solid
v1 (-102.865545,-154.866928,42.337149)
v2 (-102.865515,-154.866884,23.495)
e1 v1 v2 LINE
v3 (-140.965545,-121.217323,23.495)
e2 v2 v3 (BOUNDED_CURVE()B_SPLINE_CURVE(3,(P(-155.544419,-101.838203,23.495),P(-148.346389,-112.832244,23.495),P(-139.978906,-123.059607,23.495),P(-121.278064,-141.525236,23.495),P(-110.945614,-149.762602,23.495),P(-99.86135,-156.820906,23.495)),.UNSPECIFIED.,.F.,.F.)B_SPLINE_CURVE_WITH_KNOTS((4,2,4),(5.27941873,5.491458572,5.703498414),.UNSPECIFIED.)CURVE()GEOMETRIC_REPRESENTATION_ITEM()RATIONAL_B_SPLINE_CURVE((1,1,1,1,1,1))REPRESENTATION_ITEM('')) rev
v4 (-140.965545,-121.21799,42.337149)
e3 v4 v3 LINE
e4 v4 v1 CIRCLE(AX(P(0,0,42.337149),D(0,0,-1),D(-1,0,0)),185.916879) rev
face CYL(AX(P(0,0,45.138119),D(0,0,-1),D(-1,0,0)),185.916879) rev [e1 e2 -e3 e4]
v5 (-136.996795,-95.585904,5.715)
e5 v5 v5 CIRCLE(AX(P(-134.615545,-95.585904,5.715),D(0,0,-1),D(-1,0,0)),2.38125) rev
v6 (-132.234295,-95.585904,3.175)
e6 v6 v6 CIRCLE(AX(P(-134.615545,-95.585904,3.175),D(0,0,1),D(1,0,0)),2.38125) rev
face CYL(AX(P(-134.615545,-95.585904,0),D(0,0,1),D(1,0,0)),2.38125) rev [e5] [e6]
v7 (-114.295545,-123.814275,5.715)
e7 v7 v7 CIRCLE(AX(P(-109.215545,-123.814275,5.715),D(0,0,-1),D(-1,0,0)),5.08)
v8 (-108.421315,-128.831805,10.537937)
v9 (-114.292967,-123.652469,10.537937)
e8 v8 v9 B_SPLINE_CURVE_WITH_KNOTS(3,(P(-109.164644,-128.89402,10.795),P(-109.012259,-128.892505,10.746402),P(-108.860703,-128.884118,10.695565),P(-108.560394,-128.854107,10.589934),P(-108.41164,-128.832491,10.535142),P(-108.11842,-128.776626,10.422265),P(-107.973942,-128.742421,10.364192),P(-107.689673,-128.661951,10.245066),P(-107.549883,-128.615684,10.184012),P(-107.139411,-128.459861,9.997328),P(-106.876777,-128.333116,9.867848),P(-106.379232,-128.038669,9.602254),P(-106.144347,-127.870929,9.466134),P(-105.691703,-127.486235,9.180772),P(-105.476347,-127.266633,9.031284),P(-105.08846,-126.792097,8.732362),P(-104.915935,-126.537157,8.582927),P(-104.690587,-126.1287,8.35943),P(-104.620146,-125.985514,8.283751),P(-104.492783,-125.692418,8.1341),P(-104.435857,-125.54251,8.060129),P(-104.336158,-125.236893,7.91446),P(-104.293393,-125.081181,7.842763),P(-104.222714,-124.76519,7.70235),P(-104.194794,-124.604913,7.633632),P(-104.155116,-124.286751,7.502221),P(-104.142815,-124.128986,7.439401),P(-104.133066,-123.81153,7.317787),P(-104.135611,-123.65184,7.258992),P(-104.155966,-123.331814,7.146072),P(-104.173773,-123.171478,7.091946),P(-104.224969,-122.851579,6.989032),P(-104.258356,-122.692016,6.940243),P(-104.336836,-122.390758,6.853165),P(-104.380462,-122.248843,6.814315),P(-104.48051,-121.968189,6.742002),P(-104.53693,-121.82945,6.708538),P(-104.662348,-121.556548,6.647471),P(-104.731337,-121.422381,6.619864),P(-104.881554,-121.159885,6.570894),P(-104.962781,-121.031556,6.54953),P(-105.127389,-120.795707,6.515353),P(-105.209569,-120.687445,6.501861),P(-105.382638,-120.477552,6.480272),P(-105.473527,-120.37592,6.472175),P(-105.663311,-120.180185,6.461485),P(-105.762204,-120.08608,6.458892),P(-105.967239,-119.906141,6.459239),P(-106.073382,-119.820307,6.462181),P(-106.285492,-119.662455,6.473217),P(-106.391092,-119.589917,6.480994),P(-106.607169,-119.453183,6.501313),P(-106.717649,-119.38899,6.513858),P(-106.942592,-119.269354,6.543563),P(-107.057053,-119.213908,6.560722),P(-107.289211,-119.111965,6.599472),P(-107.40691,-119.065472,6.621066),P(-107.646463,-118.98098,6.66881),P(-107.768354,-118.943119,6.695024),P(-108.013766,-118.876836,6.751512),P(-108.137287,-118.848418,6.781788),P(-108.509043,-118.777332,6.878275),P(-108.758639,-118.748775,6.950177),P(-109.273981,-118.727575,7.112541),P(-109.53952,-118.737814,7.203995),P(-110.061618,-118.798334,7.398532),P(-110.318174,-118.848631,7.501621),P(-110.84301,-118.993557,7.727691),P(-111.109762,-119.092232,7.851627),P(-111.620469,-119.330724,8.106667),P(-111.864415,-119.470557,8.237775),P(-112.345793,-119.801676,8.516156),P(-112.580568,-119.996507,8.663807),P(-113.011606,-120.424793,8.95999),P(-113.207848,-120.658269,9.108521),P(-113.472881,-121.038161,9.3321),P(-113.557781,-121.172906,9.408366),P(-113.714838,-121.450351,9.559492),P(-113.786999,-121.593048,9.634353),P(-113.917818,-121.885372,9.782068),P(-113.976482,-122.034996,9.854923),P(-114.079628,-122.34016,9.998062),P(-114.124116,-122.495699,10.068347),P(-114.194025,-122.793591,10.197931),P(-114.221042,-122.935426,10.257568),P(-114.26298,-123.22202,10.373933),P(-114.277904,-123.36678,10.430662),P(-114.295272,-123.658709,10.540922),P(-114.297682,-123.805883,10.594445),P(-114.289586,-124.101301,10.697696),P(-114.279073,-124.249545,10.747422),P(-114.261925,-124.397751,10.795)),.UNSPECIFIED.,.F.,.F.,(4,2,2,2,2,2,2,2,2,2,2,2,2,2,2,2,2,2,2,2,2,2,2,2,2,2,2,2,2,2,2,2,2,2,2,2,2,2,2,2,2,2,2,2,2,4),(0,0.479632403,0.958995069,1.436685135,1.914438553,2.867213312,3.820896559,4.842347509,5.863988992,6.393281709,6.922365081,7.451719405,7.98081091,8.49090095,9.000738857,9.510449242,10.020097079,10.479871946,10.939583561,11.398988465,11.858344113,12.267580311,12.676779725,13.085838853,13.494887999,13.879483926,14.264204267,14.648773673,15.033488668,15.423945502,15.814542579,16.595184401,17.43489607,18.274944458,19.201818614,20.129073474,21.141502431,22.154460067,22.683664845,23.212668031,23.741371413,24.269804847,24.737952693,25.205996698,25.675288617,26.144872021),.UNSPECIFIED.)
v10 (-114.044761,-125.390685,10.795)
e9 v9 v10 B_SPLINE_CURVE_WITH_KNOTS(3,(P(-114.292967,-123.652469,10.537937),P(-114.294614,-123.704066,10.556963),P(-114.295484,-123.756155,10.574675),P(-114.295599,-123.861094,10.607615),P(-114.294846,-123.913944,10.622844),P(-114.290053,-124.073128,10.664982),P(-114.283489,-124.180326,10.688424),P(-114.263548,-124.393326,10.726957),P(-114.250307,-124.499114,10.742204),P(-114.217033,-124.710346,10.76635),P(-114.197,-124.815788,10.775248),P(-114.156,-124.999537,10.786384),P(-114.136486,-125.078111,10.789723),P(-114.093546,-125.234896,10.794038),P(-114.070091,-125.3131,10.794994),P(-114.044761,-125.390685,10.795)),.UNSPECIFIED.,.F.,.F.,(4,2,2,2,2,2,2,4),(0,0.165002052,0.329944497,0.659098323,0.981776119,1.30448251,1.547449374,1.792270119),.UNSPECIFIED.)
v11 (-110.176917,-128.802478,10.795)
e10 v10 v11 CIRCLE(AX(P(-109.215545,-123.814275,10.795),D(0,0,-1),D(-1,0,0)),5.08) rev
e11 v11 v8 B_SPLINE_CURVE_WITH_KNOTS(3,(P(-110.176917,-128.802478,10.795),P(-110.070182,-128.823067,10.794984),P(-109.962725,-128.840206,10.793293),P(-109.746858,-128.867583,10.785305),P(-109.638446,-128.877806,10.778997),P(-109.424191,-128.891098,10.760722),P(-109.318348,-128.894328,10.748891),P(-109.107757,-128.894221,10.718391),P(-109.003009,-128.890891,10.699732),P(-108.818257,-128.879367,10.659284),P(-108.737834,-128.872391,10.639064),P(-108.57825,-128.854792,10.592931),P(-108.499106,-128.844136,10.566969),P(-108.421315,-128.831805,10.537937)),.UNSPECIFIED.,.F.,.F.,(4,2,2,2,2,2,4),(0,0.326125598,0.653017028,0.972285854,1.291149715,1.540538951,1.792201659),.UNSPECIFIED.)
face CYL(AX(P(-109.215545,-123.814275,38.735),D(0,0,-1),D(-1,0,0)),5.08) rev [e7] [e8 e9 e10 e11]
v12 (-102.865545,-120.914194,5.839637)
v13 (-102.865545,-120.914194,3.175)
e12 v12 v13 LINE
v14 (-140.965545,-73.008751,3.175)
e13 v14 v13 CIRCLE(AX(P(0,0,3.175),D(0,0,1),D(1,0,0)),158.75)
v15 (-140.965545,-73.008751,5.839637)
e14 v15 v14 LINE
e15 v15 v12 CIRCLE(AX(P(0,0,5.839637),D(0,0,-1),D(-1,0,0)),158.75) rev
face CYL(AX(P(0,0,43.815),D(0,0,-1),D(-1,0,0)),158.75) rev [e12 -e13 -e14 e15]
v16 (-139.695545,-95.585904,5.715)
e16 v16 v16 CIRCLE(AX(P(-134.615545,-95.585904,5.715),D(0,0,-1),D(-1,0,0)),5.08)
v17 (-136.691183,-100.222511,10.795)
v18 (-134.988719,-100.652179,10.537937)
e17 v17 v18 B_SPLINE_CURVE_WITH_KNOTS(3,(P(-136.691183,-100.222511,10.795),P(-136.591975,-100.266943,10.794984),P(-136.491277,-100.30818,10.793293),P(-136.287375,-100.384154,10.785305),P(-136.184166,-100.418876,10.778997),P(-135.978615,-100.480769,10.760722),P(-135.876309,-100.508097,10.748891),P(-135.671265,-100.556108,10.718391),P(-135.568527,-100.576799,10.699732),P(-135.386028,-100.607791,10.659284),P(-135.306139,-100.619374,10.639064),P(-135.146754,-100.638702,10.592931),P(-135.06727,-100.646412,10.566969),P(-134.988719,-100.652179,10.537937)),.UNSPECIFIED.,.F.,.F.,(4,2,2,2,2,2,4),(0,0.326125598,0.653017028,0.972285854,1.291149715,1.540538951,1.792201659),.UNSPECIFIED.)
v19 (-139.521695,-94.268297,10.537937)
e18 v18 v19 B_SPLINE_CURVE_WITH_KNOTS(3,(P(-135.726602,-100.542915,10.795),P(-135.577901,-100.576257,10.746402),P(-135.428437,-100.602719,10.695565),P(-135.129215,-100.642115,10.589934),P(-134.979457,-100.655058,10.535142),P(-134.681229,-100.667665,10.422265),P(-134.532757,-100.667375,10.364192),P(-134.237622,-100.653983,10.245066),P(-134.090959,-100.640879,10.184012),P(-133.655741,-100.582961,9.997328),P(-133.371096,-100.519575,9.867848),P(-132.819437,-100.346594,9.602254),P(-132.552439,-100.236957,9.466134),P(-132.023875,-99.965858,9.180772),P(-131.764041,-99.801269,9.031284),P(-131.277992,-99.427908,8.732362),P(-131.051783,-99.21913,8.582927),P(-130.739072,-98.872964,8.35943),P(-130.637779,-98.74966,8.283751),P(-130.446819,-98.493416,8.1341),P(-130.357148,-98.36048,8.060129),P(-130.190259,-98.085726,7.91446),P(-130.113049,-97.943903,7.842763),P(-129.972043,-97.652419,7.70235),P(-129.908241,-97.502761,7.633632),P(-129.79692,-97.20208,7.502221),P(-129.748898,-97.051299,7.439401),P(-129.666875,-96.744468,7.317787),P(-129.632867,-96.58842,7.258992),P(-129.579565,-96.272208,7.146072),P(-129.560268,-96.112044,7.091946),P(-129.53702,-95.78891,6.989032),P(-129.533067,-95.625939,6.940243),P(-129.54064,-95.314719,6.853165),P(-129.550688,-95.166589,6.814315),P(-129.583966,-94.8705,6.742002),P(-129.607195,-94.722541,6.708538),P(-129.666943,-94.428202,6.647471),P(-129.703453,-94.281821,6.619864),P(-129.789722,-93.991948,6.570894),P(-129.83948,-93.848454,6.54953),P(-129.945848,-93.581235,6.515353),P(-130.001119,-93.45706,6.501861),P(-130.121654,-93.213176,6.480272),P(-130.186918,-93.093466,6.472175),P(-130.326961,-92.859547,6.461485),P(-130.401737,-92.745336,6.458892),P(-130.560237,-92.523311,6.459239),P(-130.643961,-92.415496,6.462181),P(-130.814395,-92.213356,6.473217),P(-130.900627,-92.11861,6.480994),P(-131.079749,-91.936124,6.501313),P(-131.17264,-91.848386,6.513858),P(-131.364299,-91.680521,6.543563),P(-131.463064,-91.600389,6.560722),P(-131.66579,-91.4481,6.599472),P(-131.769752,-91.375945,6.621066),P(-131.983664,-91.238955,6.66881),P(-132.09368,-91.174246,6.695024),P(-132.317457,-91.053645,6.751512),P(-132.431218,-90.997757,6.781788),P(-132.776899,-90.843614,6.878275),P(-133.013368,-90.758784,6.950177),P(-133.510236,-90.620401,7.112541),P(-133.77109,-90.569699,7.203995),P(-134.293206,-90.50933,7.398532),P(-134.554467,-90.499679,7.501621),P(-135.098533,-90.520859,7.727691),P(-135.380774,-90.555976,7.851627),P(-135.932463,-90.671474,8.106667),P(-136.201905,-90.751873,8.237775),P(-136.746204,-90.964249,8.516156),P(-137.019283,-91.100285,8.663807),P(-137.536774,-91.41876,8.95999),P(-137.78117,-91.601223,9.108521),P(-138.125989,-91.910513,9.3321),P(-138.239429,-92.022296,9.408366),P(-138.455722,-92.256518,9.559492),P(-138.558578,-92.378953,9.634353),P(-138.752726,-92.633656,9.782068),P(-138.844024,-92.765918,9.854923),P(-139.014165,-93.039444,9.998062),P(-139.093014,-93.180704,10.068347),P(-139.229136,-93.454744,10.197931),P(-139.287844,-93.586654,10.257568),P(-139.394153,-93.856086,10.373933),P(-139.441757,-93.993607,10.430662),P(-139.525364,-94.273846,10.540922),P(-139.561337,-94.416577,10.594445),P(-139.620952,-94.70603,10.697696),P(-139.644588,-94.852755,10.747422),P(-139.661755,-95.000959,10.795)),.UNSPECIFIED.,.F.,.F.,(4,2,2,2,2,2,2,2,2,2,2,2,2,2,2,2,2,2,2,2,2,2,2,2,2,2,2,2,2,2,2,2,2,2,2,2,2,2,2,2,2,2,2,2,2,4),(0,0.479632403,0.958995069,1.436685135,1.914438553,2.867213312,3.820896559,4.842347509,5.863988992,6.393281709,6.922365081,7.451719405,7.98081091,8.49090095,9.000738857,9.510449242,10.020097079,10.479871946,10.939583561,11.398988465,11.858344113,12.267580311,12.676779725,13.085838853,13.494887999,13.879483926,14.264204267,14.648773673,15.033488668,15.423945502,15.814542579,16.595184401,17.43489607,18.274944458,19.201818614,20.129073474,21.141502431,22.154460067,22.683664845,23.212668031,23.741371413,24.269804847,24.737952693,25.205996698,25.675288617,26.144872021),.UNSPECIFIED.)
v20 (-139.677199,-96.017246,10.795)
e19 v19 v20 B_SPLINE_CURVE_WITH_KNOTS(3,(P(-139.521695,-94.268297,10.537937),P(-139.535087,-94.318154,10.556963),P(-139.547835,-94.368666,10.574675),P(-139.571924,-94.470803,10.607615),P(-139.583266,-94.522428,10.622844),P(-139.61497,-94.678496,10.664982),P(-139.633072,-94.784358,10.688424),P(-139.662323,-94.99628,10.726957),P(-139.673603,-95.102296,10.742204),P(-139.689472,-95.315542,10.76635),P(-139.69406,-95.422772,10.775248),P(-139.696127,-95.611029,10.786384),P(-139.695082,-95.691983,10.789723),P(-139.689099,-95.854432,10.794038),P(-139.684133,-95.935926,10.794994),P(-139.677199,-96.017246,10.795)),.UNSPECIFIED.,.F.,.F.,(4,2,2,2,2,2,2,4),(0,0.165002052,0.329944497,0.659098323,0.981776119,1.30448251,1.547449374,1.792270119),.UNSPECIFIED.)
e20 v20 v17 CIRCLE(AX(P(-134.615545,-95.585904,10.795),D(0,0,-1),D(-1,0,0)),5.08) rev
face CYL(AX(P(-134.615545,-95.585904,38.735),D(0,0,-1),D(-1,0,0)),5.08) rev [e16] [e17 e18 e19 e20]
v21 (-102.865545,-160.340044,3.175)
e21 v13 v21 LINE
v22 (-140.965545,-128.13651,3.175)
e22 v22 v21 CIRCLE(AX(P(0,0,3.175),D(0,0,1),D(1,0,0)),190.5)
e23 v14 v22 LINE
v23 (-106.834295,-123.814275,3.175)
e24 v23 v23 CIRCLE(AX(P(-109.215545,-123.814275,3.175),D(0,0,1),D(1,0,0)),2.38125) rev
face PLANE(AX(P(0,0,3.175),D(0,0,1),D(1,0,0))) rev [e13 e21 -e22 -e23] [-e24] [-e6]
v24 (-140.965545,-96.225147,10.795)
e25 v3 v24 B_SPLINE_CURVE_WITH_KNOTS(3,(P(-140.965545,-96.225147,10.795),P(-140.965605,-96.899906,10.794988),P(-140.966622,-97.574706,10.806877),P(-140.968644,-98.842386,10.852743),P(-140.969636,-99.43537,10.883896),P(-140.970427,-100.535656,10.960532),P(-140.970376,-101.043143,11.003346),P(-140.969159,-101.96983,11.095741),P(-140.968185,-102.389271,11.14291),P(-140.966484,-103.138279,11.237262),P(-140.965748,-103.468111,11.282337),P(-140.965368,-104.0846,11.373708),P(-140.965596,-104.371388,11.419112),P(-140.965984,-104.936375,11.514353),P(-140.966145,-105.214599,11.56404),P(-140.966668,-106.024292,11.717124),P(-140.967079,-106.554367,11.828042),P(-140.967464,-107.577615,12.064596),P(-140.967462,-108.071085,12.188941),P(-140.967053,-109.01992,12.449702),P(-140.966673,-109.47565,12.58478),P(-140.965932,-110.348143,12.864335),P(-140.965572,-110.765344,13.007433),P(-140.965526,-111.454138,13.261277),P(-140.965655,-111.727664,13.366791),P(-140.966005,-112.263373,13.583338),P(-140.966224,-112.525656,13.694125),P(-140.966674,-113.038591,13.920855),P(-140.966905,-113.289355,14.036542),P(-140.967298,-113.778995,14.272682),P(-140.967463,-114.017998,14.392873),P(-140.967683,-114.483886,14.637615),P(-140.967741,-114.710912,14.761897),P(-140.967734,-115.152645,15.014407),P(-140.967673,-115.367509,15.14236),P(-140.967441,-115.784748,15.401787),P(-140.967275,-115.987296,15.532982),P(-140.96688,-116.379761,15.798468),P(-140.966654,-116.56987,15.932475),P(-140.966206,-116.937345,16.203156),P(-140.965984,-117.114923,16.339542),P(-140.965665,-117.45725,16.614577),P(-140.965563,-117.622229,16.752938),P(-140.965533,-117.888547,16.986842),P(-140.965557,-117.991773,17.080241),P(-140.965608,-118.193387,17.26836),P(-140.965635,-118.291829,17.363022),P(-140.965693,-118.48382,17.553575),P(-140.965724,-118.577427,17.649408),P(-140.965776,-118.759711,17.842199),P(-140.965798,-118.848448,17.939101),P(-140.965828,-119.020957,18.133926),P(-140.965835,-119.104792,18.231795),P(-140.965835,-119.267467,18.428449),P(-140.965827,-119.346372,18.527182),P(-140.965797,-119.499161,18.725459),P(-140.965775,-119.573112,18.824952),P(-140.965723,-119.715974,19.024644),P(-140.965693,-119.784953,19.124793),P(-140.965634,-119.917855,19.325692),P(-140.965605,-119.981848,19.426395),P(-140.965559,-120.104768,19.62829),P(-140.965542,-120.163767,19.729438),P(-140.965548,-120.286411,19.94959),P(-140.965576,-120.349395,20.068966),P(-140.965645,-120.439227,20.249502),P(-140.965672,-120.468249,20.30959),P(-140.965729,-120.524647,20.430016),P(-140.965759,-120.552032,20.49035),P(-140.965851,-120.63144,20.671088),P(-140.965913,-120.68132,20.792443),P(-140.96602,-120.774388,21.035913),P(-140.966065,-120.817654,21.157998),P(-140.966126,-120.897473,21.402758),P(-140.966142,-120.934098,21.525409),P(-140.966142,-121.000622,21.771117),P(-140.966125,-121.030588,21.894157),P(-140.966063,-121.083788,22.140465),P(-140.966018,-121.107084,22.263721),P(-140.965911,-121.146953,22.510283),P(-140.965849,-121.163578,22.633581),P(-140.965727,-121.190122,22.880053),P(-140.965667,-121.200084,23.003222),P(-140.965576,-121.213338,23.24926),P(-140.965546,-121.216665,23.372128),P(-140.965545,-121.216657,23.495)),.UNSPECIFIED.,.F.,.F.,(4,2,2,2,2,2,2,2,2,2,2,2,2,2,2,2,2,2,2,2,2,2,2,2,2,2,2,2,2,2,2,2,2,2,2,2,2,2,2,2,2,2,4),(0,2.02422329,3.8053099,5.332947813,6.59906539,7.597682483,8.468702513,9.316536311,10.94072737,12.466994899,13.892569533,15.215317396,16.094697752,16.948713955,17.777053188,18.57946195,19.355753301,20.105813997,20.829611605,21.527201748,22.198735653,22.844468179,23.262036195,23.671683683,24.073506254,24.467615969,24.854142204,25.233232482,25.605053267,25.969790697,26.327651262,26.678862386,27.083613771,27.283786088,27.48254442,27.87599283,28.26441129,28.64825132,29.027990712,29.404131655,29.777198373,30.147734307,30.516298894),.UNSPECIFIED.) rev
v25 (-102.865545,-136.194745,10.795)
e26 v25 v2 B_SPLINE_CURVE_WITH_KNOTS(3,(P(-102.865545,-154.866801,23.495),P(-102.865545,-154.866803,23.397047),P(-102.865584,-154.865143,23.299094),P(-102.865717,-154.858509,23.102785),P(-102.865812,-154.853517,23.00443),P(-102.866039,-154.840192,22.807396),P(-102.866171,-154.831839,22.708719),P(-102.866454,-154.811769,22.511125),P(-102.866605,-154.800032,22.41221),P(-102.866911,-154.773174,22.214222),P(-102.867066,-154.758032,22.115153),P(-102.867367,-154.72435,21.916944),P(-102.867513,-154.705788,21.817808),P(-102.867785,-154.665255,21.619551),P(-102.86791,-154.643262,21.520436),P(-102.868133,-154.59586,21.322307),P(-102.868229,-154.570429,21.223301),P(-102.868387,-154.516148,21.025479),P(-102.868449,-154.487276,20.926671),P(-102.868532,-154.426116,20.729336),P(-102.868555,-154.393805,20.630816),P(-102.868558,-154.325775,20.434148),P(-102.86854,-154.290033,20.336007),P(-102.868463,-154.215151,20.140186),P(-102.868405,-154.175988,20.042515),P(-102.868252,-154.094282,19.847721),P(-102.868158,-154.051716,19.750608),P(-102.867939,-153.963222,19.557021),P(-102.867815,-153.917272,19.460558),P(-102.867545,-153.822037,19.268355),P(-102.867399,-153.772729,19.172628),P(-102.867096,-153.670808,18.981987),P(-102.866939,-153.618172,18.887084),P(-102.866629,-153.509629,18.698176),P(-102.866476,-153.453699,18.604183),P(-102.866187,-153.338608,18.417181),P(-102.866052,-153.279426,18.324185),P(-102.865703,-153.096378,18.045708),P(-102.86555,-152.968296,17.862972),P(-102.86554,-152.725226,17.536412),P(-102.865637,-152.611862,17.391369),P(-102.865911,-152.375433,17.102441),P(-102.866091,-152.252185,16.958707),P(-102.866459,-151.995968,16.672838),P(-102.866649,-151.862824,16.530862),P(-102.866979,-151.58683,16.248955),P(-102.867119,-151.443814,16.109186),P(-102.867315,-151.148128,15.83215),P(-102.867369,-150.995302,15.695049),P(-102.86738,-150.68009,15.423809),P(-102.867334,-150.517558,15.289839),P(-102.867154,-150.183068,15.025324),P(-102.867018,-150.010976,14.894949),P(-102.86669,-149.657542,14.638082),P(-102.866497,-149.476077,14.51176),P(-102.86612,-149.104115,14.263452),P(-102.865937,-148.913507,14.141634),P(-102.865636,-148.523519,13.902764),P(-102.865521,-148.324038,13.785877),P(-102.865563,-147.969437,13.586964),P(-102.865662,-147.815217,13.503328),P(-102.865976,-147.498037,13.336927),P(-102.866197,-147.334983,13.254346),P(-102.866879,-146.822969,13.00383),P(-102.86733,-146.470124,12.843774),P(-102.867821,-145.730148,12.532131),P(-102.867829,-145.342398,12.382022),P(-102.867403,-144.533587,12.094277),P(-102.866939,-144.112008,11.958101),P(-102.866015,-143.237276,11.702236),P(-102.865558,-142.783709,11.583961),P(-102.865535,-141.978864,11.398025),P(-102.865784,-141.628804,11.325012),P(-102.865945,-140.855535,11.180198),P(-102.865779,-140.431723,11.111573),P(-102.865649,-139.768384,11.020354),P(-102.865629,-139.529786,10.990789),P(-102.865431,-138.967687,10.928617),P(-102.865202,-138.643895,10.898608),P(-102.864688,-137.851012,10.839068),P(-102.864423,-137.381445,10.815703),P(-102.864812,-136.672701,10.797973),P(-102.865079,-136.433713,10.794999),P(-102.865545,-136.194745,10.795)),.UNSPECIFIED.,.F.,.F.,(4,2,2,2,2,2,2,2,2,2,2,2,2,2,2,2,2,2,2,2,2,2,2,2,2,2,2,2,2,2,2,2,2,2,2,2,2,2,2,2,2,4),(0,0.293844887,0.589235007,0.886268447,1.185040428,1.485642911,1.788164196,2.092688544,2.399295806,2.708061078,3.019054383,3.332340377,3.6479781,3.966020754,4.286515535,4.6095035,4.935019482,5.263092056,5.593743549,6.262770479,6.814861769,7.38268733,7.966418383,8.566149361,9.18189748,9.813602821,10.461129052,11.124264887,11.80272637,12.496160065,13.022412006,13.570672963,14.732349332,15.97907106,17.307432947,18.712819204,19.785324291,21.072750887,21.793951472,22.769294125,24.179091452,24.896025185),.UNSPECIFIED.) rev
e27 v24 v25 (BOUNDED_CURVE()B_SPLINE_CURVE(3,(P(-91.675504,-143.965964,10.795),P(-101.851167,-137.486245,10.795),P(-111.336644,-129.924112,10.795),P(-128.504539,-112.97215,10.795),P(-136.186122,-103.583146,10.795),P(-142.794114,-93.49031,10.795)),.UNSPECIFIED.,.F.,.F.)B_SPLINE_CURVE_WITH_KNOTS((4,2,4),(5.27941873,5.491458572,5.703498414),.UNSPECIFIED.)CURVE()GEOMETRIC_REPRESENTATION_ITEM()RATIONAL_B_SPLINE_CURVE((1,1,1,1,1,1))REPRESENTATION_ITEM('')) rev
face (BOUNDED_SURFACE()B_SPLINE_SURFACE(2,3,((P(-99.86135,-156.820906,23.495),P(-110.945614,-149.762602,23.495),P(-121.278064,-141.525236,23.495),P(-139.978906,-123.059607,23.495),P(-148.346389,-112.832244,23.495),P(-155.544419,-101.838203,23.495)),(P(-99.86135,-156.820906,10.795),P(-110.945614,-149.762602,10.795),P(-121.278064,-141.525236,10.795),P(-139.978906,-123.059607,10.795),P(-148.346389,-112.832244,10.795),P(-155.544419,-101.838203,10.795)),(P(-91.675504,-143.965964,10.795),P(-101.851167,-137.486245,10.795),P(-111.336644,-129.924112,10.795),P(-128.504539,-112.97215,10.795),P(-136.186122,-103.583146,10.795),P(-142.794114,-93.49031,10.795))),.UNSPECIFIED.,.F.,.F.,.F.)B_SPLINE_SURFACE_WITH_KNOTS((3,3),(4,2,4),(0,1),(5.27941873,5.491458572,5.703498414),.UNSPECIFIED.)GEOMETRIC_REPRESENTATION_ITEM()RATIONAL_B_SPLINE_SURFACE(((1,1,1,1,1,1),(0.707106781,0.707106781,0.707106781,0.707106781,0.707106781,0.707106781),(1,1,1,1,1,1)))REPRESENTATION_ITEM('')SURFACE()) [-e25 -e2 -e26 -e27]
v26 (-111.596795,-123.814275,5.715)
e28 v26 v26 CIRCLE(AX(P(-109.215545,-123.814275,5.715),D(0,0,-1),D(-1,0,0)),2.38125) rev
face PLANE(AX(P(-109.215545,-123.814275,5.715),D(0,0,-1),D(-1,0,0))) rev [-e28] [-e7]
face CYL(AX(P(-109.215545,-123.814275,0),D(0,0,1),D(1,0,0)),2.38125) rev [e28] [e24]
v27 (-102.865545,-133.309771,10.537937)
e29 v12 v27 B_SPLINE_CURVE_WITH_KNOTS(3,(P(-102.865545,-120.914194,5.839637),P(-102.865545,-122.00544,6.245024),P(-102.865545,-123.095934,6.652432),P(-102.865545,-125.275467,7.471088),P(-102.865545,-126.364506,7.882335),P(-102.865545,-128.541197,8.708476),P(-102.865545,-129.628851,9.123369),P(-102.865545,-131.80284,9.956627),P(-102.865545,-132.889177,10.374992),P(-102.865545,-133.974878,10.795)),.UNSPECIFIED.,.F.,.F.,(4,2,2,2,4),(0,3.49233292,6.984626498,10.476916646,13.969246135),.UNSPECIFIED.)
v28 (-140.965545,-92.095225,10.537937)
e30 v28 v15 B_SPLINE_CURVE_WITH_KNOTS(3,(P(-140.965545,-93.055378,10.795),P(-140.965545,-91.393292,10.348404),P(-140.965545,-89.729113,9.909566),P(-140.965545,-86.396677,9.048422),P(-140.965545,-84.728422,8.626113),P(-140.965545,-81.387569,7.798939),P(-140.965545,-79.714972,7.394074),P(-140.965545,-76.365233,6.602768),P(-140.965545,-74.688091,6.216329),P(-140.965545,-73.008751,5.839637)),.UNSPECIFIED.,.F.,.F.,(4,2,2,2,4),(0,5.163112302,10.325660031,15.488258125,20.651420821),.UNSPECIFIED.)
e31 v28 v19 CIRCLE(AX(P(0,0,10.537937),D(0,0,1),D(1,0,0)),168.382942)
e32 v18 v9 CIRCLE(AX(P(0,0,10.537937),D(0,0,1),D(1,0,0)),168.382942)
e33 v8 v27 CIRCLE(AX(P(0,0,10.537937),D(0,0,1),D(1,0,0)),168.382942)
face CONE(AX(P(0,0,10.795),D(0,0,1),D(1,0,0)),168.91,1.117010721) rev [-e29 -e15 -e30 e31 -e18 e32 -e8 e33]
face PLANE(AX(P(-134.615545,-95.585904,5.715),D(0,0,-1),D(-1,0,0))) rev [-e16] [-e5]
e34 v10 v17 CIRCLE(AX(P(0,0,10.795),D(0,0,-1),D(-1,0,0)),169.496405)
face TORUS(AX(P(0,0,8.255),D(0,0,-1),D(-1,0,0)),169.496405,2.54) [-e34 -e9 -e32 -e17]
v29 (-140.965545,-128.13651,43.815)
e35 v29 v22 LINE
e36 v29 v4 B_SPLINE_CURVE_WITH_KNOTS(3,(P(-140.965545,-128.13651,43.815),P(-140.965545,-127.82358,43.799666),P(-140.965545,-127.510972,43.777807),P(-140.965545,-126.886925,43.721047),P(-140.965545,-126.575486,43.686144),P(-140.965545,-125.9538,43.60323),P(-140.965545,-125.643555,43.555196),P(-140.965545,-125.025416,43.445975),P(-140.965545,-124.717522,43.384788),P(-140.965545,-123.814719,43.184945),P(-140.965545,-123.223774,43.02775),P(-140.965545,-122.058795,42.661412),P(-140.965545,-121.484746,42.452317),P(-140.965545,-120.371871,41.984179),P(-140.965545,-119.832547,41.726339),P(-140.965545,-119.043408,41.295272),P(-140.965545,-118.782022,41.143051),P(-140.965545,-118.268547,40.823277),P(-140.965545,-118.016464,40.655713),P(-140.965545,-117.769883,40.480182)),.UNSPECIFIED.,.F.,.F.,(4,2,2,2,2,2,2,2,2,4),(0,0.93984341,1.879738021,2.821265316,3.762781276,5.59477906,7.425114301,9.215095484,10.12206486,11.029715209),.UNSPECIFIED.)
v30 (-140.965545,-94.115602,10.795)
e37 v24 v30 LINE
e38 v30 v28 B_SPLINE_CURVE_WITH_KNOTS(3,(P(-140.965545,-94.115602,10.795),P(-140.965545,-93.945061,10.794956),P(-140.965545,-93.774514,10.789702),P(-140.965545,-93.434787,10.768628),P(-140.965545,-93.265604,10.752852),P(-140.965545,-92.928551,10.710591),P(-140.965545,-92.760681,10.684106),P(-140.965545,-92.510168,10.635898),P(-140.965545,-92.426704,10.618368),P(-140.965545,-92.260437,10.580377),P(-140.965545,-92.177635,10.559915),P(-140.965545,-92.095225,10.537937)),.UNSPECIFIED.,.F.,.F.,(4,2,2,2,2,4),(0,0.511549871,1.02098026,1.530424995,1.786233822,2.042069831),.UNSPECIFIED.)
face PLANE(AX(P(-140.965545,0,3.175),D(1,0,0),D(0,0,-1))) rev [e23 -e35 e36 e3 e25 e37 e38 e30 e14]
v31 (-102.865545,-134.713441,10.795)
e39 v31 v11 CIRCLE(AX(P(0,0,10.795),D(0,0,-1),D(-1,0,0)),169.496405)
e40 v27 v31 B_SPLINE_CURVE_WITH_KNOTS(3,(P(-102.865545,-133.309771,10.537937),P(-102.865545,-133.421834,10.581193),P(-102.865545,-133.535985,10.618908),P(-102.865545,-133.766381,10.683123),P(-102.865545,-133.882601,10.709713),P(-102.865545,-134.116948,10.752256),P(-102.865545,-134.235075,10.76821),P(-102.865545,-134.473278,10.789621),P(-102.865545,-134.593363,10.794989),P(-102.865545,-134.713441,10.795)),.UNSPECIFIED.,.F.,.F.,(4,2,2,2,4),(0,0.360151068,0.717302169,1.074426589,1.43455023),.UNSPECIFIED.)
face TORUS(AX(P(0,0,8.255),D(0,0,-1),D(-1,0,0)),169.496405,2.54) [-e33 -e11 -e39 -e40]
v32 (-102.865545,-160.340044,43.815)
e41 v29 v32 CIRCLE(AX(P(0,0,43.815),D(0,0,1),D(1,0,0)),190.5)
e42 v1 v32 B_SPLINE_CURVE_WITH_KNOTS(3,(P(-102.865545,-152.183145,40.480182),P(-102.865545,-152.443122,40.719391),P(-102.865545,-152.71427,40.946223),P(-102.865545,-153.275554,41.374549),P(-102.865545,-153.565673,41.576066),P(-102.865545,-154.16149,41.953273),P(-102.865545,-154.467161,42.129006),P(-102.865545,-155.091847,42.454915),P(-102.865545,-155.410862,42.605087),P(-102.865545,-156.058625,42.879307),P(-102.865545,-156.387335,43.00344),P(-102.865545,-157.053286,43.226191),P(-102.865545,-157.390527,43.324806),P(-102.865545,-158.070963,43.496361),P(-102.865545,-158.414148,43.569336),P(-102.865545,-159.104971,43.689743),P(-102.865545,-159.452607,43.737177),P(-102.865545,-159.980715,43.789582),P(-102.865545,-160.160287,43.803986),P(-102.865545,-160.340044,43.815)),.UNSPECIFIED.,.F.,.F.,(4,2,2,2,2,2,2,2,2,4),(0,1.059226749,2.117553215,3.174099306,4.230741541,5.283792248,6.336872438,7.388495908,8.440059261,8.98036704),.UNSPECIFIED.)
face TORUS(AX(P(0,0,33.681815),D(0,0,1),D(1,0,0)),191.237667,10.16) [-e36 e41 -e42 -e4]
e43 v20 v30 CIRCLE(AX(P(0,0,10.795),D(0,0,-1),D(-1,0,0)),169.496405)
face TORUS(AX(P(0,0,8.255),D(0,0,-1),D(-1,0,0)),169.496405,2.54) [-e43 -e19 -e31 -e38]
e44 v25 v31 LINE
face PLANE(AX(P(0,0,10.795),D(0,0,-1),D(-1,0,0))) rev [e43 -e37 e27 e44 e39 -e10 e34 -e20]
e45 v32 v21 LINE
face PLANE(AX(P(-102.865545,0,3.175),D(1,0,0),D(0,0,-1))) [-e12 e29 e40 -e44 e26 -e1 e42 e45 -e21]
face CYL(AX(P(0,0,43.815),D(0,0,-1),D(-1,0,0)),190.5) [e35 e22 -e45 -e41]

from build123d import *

# Parameters (mm, degrees)
SKETCH1_R               = 2.38125
BOSS_EXTRUDE1_DEPTH     = 3.175
BOSS_EXTRUDE2_DEPTH     = 50.8
CUT_EXTRUDE1_DEPTH      = 209.526843613
CUT_EXTRUDE1_DEPTH_BACK = 209.526843613
SKETCH3_R               = 203.829254644
SKETCH3_R_2             = 174.625
SKETCH5_R               = 2.38125
CUT_EXTRUDE3_DEPTH      = 200.484174202
SKETCH6_W               = 205.731089426
SKETCH6_H               = 25.4
BOSS_EXTRUDE3_DEPTH     = 3.175
SKETCH8_R               = 2.38125
CUT_EXTRUDE5_DEPTH      = 200.484174202
SKETCH9_W               = 205.731089426
SKETCH9_H               = 38.1
BOSS_EXTRUDE4_DEPTH     = 3.175
SKETCH10_R              = 6.35
SKETCH10_R_2            = 2.38125
CUT_EXTRUDE6_DEPTH      = 200.484174202
SKETCH11_W              = 53.331089426
SKETCH11_H              = 31.75
BOSS_EXTRUDE5_DEPTH     = 3.175
FILLET1_R               = 10.16
SKETCH12_R              = 6.35
SKETCH12_R_2            = 2.38125
CUT_EXTRUDE7_DEPTH      = 200.484174202
FILLET2_R               = 2.54
CUT_EXTRUDE8_DEPTH      = 200.484174202
SKETCH14_W              = 2.759281453
SKETCH14_H              = 7.963584416
SKETCH14_W_2            = 2.527010149
SKETCH14_H_2            = 5.938870156
BOSS_EXTRUDE6_DEPTH     = 3.175
FILLET3_R               = 2.54
SKETCH15_R              = 2.38125
BOSS_EXTRUDE7_DEPTH     = 40.64
SKETCH16_R              = 227.754671792
SKETCH16_W              = 368.539826918
SKETCH16_H              = 147.114866813
CUT_EXTRUDE9_DEPTH      = 218.328838711
SKETCH17_R              = 87.195519402
CUT_EXTRUDE10_DEPTH     = 218.328838646
CHAMFER1_SIZE           = 27.94
CHAMFER1_SIZE_2         = 31.030513664
CUT_EXTRUDE12_START     = -2.54
SKETCH18_R              = 5.08
CUT_EXTRUDE12_DEPTH     = 33.02
FILLET4_R               = 10.16
CUT_EXTRUDE13_START     = -7.62
SKETCH20_R              = 185.916878671
CUT_EXTRUDE13_DEPTH     = 210.708838803
FILLET5_SIZE            = 12.7
FILLET5_SIZE_2          = 15.24
CHAMFER2_SIZE           = 10.16
CHAMFER2_SIZE_2         = 4.9553631
FILLET6_R               = 2.54


with BuildPart() as part:
    # Sketch1 → Boss-Extrude1 (new body)
    with BuildSketch(Plane.XY):
        with BuildLine():
            Line((-102.865544713, 31.75), (-102.865544713, 145.022480019))
            ThreePointArc((-102.865544713, 145.022480019), (-123.286100955, 128.114703728), (-140.965544713, 108.358457002))
            Line((-140.965544713, 108.358457002), (-140.965544713, -108.358457002))
            ThreePointArc((-140.965544713, -108.358457002), (-123.286100955, -128.114703728), (-102.865544713, -145.022480019))
            Line((-102.865544713, -145.022480019), (-102.865544713, -69.85))
            Line((-102.865544713, -69.85), (102.865544713, -69.85))
            Line((102.865544713, -69.85), (102.865544713, -145.022480019))
            ThreePointArc((102.865544713, -145.022480019), (123.286100955, -128.114703728), (140.965544713, -108.358457002))
            Line((140.965544713, -108.358457002), (140.965544713, 108.358457002))
            ThreePointArc((140.965544713, 108.358457002), (123.286100955, 128.114703728), (102.865544713, 145.022480019))
            Line((102.865544713, 145.022480019), (102.865544713, 31.75))
            Line((102.865544713, 31.75), (-102.865544713, 31.75))
        make_face()
        with Locations((25.4, -38.1)):
            Circle(SKETCH1_R, mode=Mode.SUBTRACT)
        with Locations((-25.4, -38.1)):
            Circle(SKETCH1_R, mode=Mode.SUBTRACT)
        with Locations((0, -38.1)):
            Circle(SKETCH1_R, mode=Mode.SUBTRACT)
    extrude(amount=BOSS_EXTRUDE1_DEPTH)

    # Sketch2 → Boss-Extrude2 (add)
    with BuildSketch(Plane.XY.offset(3.175)):
        with BuildLine():
            ThreePointArc((-102.865544713, -141.111907137), (-123.390730203, -123.566250752), (-140.965544713, -103.06602655))
            Line((-140.965544713, -103.06602655), (-140.965544713, -108.358457002))
            ThreePointArc((-140.965544713, -108.358457002), (-123.286100955, -128.114703728), (-102.865544713, -145.022480019))
            Line((-102.865544713, -145.022480019), (-102.865544713, -141.111907137))
        make_face()
        with BuildLine():
            ThreePointArc((140.965544713, -103.06602655), (123.390730203, -123.566250752), (102.865544713, -141.111907137))
            Line((102.865544713, -141.111907137), (102.865544713, -145.022480019))
            ThreePointArc((102.865544713, -145.022480019), (123.286100955, -128.114703728), (140.965544713, -108.358457002))
            Line((140.965544713, -108.358457002), (140.965544713, -103.06602655))
        make_face()
    extrude(amount=BOSS_EXTRUDE2_DEPTH)

    # Sketch3 → Cut-Extrude1 (cut, two sides: drawn at the far end of the back side and taken through both)
    with BuildSketch(Plane.XY.offset(3.175).offset(-CUT_EXTRUDE1_DEPTH_BACK)):
        Circle(SKETCH3_R)
        Circle(SKETCH3_R_2, mode=Mode.SUBTRACT)
    extrude(amount=CUT_EXTRUDE1_DEPTH + CUT_EXTRUDE1_DEPTH_BACK, mode=Mode.SUBTRACT)

    # Sketch5 → Cut-Extrude3 (cut, through all)
    with BuildSketch(Plane.XY.offset(3.175)):
        with Locations((134.615544713, -95.585904409)):
            Circle(SKETCH5_R)
        with Locations((109.215544713, -123.814275401)):
            Circle(SKETCH5_R)
        with Locations(Location((-134.615544713, -95.585904409, 0), (0, 0, 180))):
            Circle(SKETCH5_R)
        with Locations(Location((-109.215544713, -123.814275401, 0), (0, 0, 180))):
            Circle(SKETCH5_R)
    extrude(amount=-CUT_EXTRUDE3_DEPTH, mode=Mode.SUBTRACT)

    # Sketch6 → Boss-Extrude3 (add)
    with BuildSketch(Plane.XY.offset(3.175)):
        with Locations((0, 77.611907137)):
            Rectangle(SKETCH6_W, SKETCH6_H)
    extrude(amount=-BOSS_EXTRUDE3_DEPTH)

    # Sketch8 → Cut-Extrude5 (cut, through all)
    with BuildSketch(Plane.XY.offset(3.175)):
        with Locations((-38.1, -38.1)):
            Circle(SKETCH8_R)
        with Locations((-50.8, -38.1)):
            Circle(SKETCH8_R)
        with Locations((12.7, -38.1)):
            Circle(SKETCH8_R)
        with Locations((-12.7, -38.1)):
            Circle(SKETCH8_R)
    extrude(amount=-CUT_EXTRUDE5_DEPTH, mode=Mode.SUBTRACT)

    # Sketch9 → Boss-Extrude4 (add)
    with BuildSketch(Plane.XY.offset(3.175)):
        with Locations((0, -88.9)):
            Rectangle(SKETCH9_W, SKETCH9_H)
    extrude(amount=-BOSS_EXTRUDE4_DEPTH)

    # Sketch10 → Cut-Extrude6 (cut, through all)
    with BuildSketch(Plane.XY.offset(3.175)):
        with Locations((0, -76.2)):
            Circle(SKETCH10_R)
        with Locations((-25.4, -76.2)):
            Circle(SKETCH10_R_2)
        with Locations((-38.1, -76.2)):
            Circle(SKETCH10_R_2)
        with Locations((25.4, -76.2)):
            Circle(SKETCH10_R_2)
    extrude(amount=-CUT_EXTRUDE6_DEPTH, mode=Mode.SUBTRACT)

    # Sketch11 → Boss-Extrude5 (add)
    with BuildSketch(Plane.XY.offset(3.175)):
        with Locations((0, -123.825)):
            Rectangle(SKETCH11_W, SKETCH11_H)
    extrude(amount=-BOSS_EXTRUDE5_DEPTH)

    # Fillet1
    fillet1_edges = [part.edges().sort_by_distance(p)[0] for p in [
        (-26.665544713, -139.7, 1.5875),
        (-26.665544713, -107.95, 1.5875),
        (26.665544713, -107.95, 1.5875),
        (26.665544713, -139.7, 1.5875),
    ]]
    fillet(fillet1_edges, radius=FILLET1_R)

    # Sketch12 → Cut-Extrude7 (cut, through all)
    with BuildSketch(Plane.XY.offset(3.175)):
        with Locations((-25.4, -76.2)):
            Circle(SKETCH12_R)
        with Locations((25.4, -76.2)):
            Circle(SKETCH12_R)
        with Locations((-8.66775, -67.53225)):
            Circle(SKETCH12_R_2)
        with Locations((8.66775, -67.53225)):
            Circle(SKETCH12_R_2)
        with Locations((8.66775, -84.86775)):
            Circle(SKETCH12_R_2)
        with Locations((-8.66775, -84.86775)):
            Circle(SKETCH12_R_2)
    extrude(amount=-CUT_EXTRUDE7_DEPTH, mode=Mode.SUBTRACT)

    # Fillet2
    fillet2_edges = [part.edges().sort_by_distance(p)[0] for p in [
        (-102.865544713, 141.111907137, 1.5875),
        (102.865544713, 141.111907137, 1.5875),
    ]]
    fillet(fillet2_edges, radius=FILLET2_R)

    # Sketch13 → Cut-Extrude8 (cut, through all)
    # profile 1 of 4: a face of its own
    with BuildSketch(Plane.XY.offset(3.175)):
        with BuildLine():
            Line((-29.807958333, -15.810565048), (-38.216416667, -15.810565048))
            Line((-38.216416667, -15.810565048), (-33.538583333, 6.245101619))
            Line((-33.538583333, 6.245101619), (-38.803791667, 6.245101619))
            Line((-38.803791667, 6.245101619), (-39.682208333, 2.075268285))
            Line((-39.682208333, 2.075268285), (-48.095958333, 2.075268285))
            Line((-48.095958333, 2.075268285), (-47.397458333, 5.477809952))
            add(Edge.make_bspline(
                [(-47.397458333, 5.477809952), (-47.320569058, 5.758194134), (-47.170922216, 6.303895823), (-46.789013651, 7.053374007), (-46.29771223, 7.715065901), (-45.690436731, 8.272796577), (-45.006500067, 8.730292102), (-44.253147871, 9.054960677), (-43.448405111, 9.260244914), (-42.891974442, 9.282012228), (-42.6085, 9.293101619)],
                knots=[0, 0, 0, 0, 1.050168006, 2.043904372, 3.024673376, 4.01863537, 5.013909092, 5.989008141, 6.975497172, 8, 8, 8, 8], degree=3))
            Line((-42.6085, 9.293101619), (-24.463375, 9.293101619))
            Line((-24.463375, 9.293101619), (-29.807958333, -15.810565048))
        make_face()
    # profile 2 of 4: a face of its own
    with BuildSketch(Plane.XY.offset(3.175)):
        with BuildLine():
            add(Edge.make_bspline(
                [(-3.566583333, -12.132856715), (-3.643765668, -12.421811436), (-3.79437451, -12.985659844), (-4.17293599, -13.764550451), (-4.665381385, -14.453577746), (-5.270434906, -15.036263062), (-5.950809803, -15.518035961), (-6.703009887, -15.859816489), (-7.511777843, -16.068702787), (-8.070292693, -16.093985699), (-8.355541667, -16.106898381)],
                knots=[0, 0, 0, 0, 1.062369753, 2.073042759, 3.062499936, 4.061251344, 5.048575831, 6.014824268, 6.986115874, 8, 8, 8, 8], degree=3))
            Line((-8.355541667, -16.106898381), (-22.547791667, -16.106898381))
            add(Edge.make_bspline(
                [(-22.547791667, -16.106898381), (-22.69262218, -16.104596964), (-22.972752339, -16.100145578), (-23.378206431, -16.044702396), (-23.755568174, -15.960682303), (-24.107157142, -15.846746121), (-24.426210233, -15.691540895), (-24.716954418, -15.504453058), (-24.976786635, -15.281711317), (-25.203806964, -15.025677099), (-25.40308213, -14.746169713), (-25.554358436, -14.435544628), (-25.674211179, -14.106195373), (-25.74344938, -13.752832717), (-25.791514529, -13.37950469), (-25.77975916, -12.981941289), (-25.73922686, -12.562383844), (-25.682974686, -12.278883611), (-25.654, -12.132856715)],
                knots=[0, 0, 0, 0, 1.158779845, 2.241303809, 3.269110906, 4.251580925, 5.192683609, 6.101443689, 7.012833415, 7.922909267, 8.835720222, 9.751475912, 10.680528402, 11.633319635, 12.628295421, 13.687540584, 14.808885378, 16, 16, 16, 16], degree=3))
            Line((-25.654, -12.132856715), (-21.997458333, 5.319059952))
            add(Edge.make_bspline(
                [(-21.997458333, 5.319059952), (-21.920272116, 5.608009048), (-21.769655695, 6.171846477), (-21.391148554, 6.950815808), (-20.898502375, 7.639552216), (-20.293153244, 8.224337096), (-19.608609326, 8.702683082), (-18.855913228, 9.046275843), (-18.048644228, 9.254382857), (-17.4919553, 9.28003834), (-17.2085, 9.293101619)],
                knots=[0, 0, 0, 0, 1.062516124, 2.073328378, 3.062921881, 4.061810895, 5.05442655, 6.020808115, 6.992233544, 8, 8, 8, 8], degree=3))
            Line((-17.2085, 9.293101619), (-3.01625, 9.293101619))
            add(Edge.make_bspline(
                [(-3.01625, 9.293101619), (-2.871419505, 9.290800192), (-2.591289383, 9.286348788), (-2.185835038, 9.230905733), (-1.808474182, 9.146885197), (-1.456882118, 9.03295056), (-1.137839887, 8.877739913), (-0.847056821, 8.690671483), (-0.587369032, 8.467857656), (-0.359809395, 8.212092615), (-0.16209325, 7.930921186), (-0.002983257, 7.623293687), (0.114459046, 7.2921344), (0.187047795, 6.939473562), (0.223589985, 6.565305639), (0.223678302, 6.168188246), (0.179743785, 5.748571863), (0.123975462, 5.465081675), (0.09525, 5.319059952)],
                knots=[0, 0, 0, 0, 1.158432062, 2.24063113, 3.268129752, 4.250304904, 5.191125136, 6.099612471, 7.010728663, 7.920531375, 8.833068369, 9.75494936, 10.683723015, 11.636228288, 12.62940148, 13.688234619, 14.809242866, 16, 16, 16, 16], degree=3))
            Line((0.09525, 5.319059952), (-3.566583333, -12.132856715))
        make_face()
        Polygon((-13.403791667, 6.245101619), (-17.425458333, -13.058898381), (-12.16025, -13.058898381), (-8.138583333, 6.245101619), align=None, mode=Mode.SUBTRACT)
    # profile 3 of 4: a face of its own
    with BuildSketch(Plane.XY.offset(3.175)):
        with BuildLine():
            Line((11.557, 9.293101619), (8.556625, -5.269565048))
            Line((8.556625, -5.269565048), (13.827125, -5.269565048))
            Line((13.827125, -5.269565048), (16.8275, 9.293101619))
            Line((16.8275, 9.293101619), (25.235958333, 9.293101619))
            Line((25.235958333, 9.293101619), (19.896666667, -16.106898381))
            Line((19.896666667, -16.106898381), (11.482916667, -16.106898381))
            Line((11.482916667, -16.106898381), (13.165666667, -8.317565048))
            Line((13.165666667, -8.317565048), (3.439583333, -8.317565048))
            add(Edge.make_bspline(
                [(3.439583333, -8.317565048), (3.294736233, -8.315312365), (3.014573993, -8.310955241), (2.609344629, -8.25485176), (2.230636814, -8.173029355), (1.881290806, -8.050712181), (1.561052368, -7.897312045), (1.270346477, -7.709804396), (1.009103929, -7.48515858), (0.777806767, -7.227358437), (0.580756638, -6.941550122), (0.426179112, -6.6292081), (0.309007624, -6.297036788), (0.237889907, -5.94070984), (0.190785312, -5.563660832), (0.202000265, -5.162620664), (0.243321079, -4.739613917), (0.29915982, -4.45427987), (0.328083333, -4.306481715)],
                knots=[0, 0, 0, 0, 1.152191709, 2.228561082, 3.250524676, 4.231939746, 5.167691878, 6.071285285, 6.977493388, 7.902223819, 8.821393841, 9.731943086, 10.66895861, 11.616332835, 12.619603957, 13.686867372, 14.801836863, 16, 16, 16, 16], degree=3))
            Line((0.328083333, -4.306481715), (3.14325, 9.293101619))
            Line((3.14325, 9.293101619), (11.557, 9.293101619))
        make_face()
    # profile 4 of 4: a face of its own
    with BuildSketch(Plane.XY.offset(3.175)):
        with BuildLine():
            Line((33.374541667, -13.058898381), (47.0535, -13.058898381))
            Line((47.0535, -13.058898381), (46.392041667, -16.106898381))
            Line((46.392041667, -16.106898381), (24.304625, -16.106898381))
            Line((24.304625, -16.106898381), (25.802166667, -9.143065048))
            add(Edge.make_bspline(
                [(25.802166667, -9.143065048), (25.879273752, -8.861031474), (26.029757165, -8.310610268), (26.410334887, -7.552072135), (26.901419327, -6.879703753), (27.508831265, -6.311820899), (28.191228528, -5.842472815), (28.946271137, -5.513745702), (29.752164487, -5.300517366), (30.311046908, -5.28002739), (30.596416667, -5.269565048)],
                knots=[0, 0, 0, 0, 1.049169808, 2.047576474, 3.031944376, 4.027910562, 5.023553593, 5.994653504, 6.976054309, 8, 8, 8, 8], degree=3))
            Line((30.596416667, -5.269565048), (40.3225, -5.269565048))
            Line((40.3225, -5.269565048), (42.661416667, 6.245101619))
            Line((42.661416667, 6.245101619), (37.396208333, 6.245101619))
            Line((37.396208333, 6.245101619), (36.517791667, 2.075268285))
            Line((36.517791667, 2.075268285), (28.104041667, 2.075268285))
            Line((28.104041667, 2.075268285), (28.802541667, 5.477809952))
            add(Edge.make_bspline(
                [(28.802541667, 5.477809952), (28.879430942, 5.758194134), (29.029077784, 6.303895823), (29.410986349, 7.053374007), (29.90228777, 7.715065901), (30.509563269, 8.272796577), (31.193499933, 8.730292102), (31.946852129, 9.054960677), (32.751594889, 9.260244914), (33.308025558, 9.282012228), (33.5915, 9.293101619)],
                knots=[0, 0, 0, 0, 1.050168006, 2.043904372, 3.024673376, 4.01863537, 5.013909092, 5.989008141, 6.975497172, 8, 8, 8, 8], degree=3))
            Line((33.5915, 9.293101619), (47.78375, 9.293101619))
            add(Edge.make_bspline(
                [(47.78375, 9.293101619), (47.92859726, 9.290849086), (48.208759811, 9.286492252), (48.613987002, 9.230386738), (48.992702458, 9.148571481), (49.342021711, 9.026229282), (49.662353678, 8.87291663), (49.952725098, 8.685096123), (50.214324347, 8.462382804), (50.440285412, 8.20121114), (50.636405741, 7.915869715), (50.798510828, 7.606235104), (50.913345969, 7.272328086), (50.987754572, 6.916671215), (51.023365934, 6.538801464), (51.023963511, 6.138199286), (50.97928388, 5.715135649), (50.923924969, 5.429811378), (50.89525, 5.282018285)],
                knots=[0, 0, 0, 0, 1.152517565, 2.229191352, 3.251443972, 4.233136601, 5.169153376, 6.073002333, 6.979466726, 7.895134038, 8.814564014, 9.731738245, 10.66901877, 11.616660927, 12.618740334, 13.686213184, 14.801498005, 16, 16, 16, 16], degree=3))
            Line((50.89525, 5.282018285), (48.916166667, -4.306481715))
            add(Edge.make_bspline(
                [(48.916166667, -4.306481715), (48.838706266, -4.597052385), (48.687148602, -5.165577869), (48.311448965, -5.952788492), (47.817473721, -6.648200027), (47.212376239, -7.235653604), (46.533647997, -7.724482215), (45.778706123, -8.063324207), (44.971906745, -8.281163221), (44.41262475, -8.30526518), (44.127208333, -8.317565048)],
                knots=[0, 0, 0, 0, 1.06412456, 2.082047477, 3.072647496, 4.071792832, 5.058775816, 6.021176094, 6.990153746, 8, 8, 8, 8], degree=3))
            Line((44.127208333, -8.317565048), (34.395833333, -8.317565048))
            Line((34.395833333, -8.317565048), (33.374541667, -13.058898381))
        make_face()
    extrude(amount=-CUT_EXTRUDE8_DEPTH, mode=Mode.SUBTRACT)


with BuildPart() as cut_extrude8_piece_1:
    # of the separate pieces the step leaves, piece 1, a body of its own (cut_extrude8_pieces)
    add(part.part.solids().sort_by_distance((-106.961346111, 138.033188267, 0))[0])



with BuildPart() as cut_extrude8_piece_2:
    # of the separate pieces the step leaves, piece 2, a body of its own (cut_extrude8_pieces)
    add(part.part.solids().sort_by_distance((-8.138583333, 6.245101619, 0))[0])


with BuildPart() as cut_extrude8_piece_1_1:
    add(cut_extrude8_piece_1.part)

    add(cut_extrude8_piece_2.part)  # Boss-Extrude6 merges Cut-Extrude8 piece 2
    # Sketch14 → Boss-Extrude6 (add)
    with BuildSketch(Plane.XY.offset(3.175)):
        with Locations((-11.017521916, 7.88967512)):
            Rectangle(SKETCH14_W, SKETCH14_H)
        with Locations((-14.795211944, -14.779945163)):
            Rectangle(SKETCH14_W_2, SKETCH14_H_2)
    extrude(amount=-BOSS_EXTRUDE6_DEPTH)

    # Fillet3
    fillet3_edges = [cut_extrude8_piece_1_1.edges().sort_by_distance(p)[0] for p in [
        (102.865544713, 90.311907137, 1.5875),
        (102.865544713, 31.75, 1.5875),
        (-102.865544713, 64.911907137, 1.5875),
        (-102.865544713, 31.75, 1.5875),
        (-102.865544713, 90.311907137, 1.5875),
        (102.865544713, 64.911907137, 1.5875),
    ]]
    fillet(fillet3_edges, radius=FILLET3_R)

    # Sketch15 → Boss-Extrude7 (add)
    # profile 1 of 2: a face of its own
    with BuildSketch(Plane.XY.offset(3.175)):
        with BuildLine():
            ThreePointArc((-102.865544713, -120.914193587), (-124.246259111, -98.815128381), (-140.965544713, -73.008750871))
            Line((-140.965544713, -73.008750871), (-140.965544713, -128.136510034))
            ThreePointArc((-140.965544713, -128.136510034), (-122.97425317, -145.49083496), (-102.865544713, -160.340044003))
            Line((-102.865544713, -160.340044003), (-102.865544713, -120.914193587))
        make_face()
        with Locations((-109.215544713, -123.814275401)):
            Circle(SKETCH15_R, mode=Mode.SUBTRACT)
        with Locations((-134.615544713, -95.585904409)):
            Circle(SKETCH15_R, mode=Mode.SUBTRACT)
    # profile 2 of 2: a face of its own
    with BuildSketch(Plane.XY.offset(3.175)):
        with BuildLine():
            Line((140.965544713, -128.136510034), (140.965544713, -73.008750871))
            ThreePointArc((140.965544713, -73.008750871), (124.246259111, -98.815128381), (102.865544713, -120.914193587))
            Line((102.865544713, -120.914193587), (102.865544713, -160.340044003))
            ThreePointArc((102.865544713, -160.340044003), (122.97425317, -145.49083496), (140.965544713, -128.136510034))
        make_face()
        with Locations((109.215544713, -123.814275401)):
            Circle(SKETCH15_R, mode=Mode.SUBTRACT)
        with Locations((134.615544713, -95.585904409)):
            Circle(SKETCH15_R, mode=Mode.SUBTRACT)
    extrude(amount=BOSS_EXTRUDE7_DEPTH)

    # Sketch16 → Cut-Extrude9 (cut, through all)
    with BuildSketch(Plane.XY.offset(3.175)):
        Circle(SKETCH16_R)
        with Locations((23.411183864, 115.93750226)):
            Rectangle(SKETCH16_W, SKETCH16_H)
    extrude(amount=-CUT_EXTRUDE9_DEPTH, mode=Mode.SUBTRACT)


with BuildPart() as cut_extrude9_piece_1:
    # of the separate pieces the step leaves, piece 1, a body of its own (cut_extrude9_pieces)
    add(cut_extrude8_piece_1_1.part.solids().sort_by_distance((-140.965544713, -128.136510034, 3.175))[0])

    # Chamfer1
    # the kernel refuses this chamfer: 31.030513664, 27.94 mm, written as the material it takes off along each edge
    with BuildSketch(Plane(origin=(0, 0, 43.815), x_dir=(-0.20017923188636447, -0.9797592944807337, 0), z_dir=(0.9797592944807337, -0.20017923188636447, 0))) as chamfer1_piece_1:
        Polygon((158.75 + CHAMFER1_SIZE, 0), (158.75, CHAMFER1_SIZE_2), (158.75, 0), align=None)
    revolve(axis=Axis((0, 0, 43.815), (0, 0, -1)), revolution_arc=79.913485183, mode=Mode.SUBTRACT)

    # Sketch18 → Cut-Extrude12 (cut)
    with BuildSketch(Plane(origin=(0, 0, 3.175), x_dir=(-1, 0, 0), z_dir=(0, 0, -1)).offset(CUT_EXTRUDE12_START)):
        with Locations((134.615544713, -95.585904409)):
            Circle(SKETCH18_R)
        with Locations((109.215544713, -123.814275401)):
            Circle(SKETCH18_R)
    extrude(amount=-CUT_EXTRUDE12_DEPTH, mode=Mode.SUBTRACT)

    # Fillet4
    # the kernel refuses this fillet: 10.16 mm, written as the material it takes off along each edge
    with BuildSketch(Plane(origin=(0, 0, 43.815), x_dir=(-0.4998842027499923, -0.8660922490364434, 0), z_dir=(0.8660922490364434, -0.4998842027499923, 0))) as fillet4_piece_1:
        with BuildLine():
            CenterArc((191.237667396, 10.133185423), FILLET4_R, 222, 43.836372996)
            Line((183.68731597, 3.334818462), (183.536308941, 3.198851123))
            Line((183.536308941, 3.198851123), (186.538992971, -0.135967339))
            Line((186.538992971, -0.135967339), (186.69, -0.2032))
            ThreePointArc((186.69, -0.2032), (188.595, -0.2032), (190.485246652, -0.202663708))
            Line((190.485246652, -0.202663708), (190.5, 0))
        make_face()
    revolve(axis=Axis((0, 0, 43.815), (0, 0, -1)), revolution_arc=22.482929592, mode=Mode.SUBTRACT)

    # Sketch20 → Cut-Extrude13 (cut, through all)
    with BuildSketch(Plane(origin=(0, 0, 3.175), x_dir=(-1, 0, 0), z_dir=(0, 0, -1)).offset(CUT_EXTRUDE13_START)):
        Circle(SKETCH20_R)
    extrude(amount=-CUT_EXTRUDE13_DEPTH, mode=Mode.SUBTRACT)

    # Fillet5
    # an asymmetric fillet: 15.24, 12.7 mm, written as the material it adds along each edge
    with BuildSketch(Plane(origin=(0, 0, 10.795), x_dir=(-0.37219545317255504, -0.9281543754342143, 0), z_dir=(0.9281543754342143, -0.37219545317255504, 0))) as fillet5_piece_1_section:
        with BuildLine():
            Bezier((185.916878671, -FILLET5_SIZE), (185.916878671, 0), (185.916878671 - FILLET5_SIZE_2, 0), weights=[1, 0.707106781, 1])
            Line((185.916878671 - FILLET5_SIZE_2, 0), (185.916878671, 0))
            Line((185.916878671, 0), (185.916878671, -FILLET5_SIZE))
        make_face()
    fillet5_piece_1 = revolve(axis=Axis((0, 0, 10.795), (0, 0, -1)), revolution_arc=39.198065471, mode=Mode.PRIVATE)
    fillet5_piece_1 = split(fillet5_piece_1, bisect_by=Plane(origin=(-140.965544713, -133.970271088, 13.593151192), z_dir=(1, 0, 0)), keep=Keep.TOP, mode=Mode.PRIVATE)
    fillet5_piece_1 = split(fillet5_piece_1, bisect_by=Plane(origin=(-102.865544713, -133.970271088, 13.593151192), z_dir=(-1, 0, 0)), keep=Keep.TOP, mode=Mode.PRIVATE)
    add(fillet5_piece_1)

    # Chamfer2
    # the kernel refuses this chamfer: 10.16, 4.9553631 mm, written as the material it takes off along each edge
    with BuildSketch(Plane(origin=(0, 0, 10.795), x_dir=(-0.5133970128163213, -0.8581512146651533, 0), z_dir=(0.8581512146651533, -0.5133970128163213, 0))) as chamfer2_piece_1:
        Polygon((158.75 + CHAMFER2_SIZE, 0), (158.75, CHAMFER2_SIZE_2), (158.75, 0), align=None)
    revolve(axis=Axis((0, 0, 10.795), (0, 0, -1)), revolution_arc=41.227627295, mode=Mode.SUBTRACT)

    # Fillet6
    # the kernel refuses this fillet: 2.54 mm, written as the material it takes off along each edge
    with BuildSketch(Plane(origin=(0, 0, 10.795), x_dir=(-0.8219286457205435, -0.5695904680943961, 0), z_dir=(0.5695904680943961, -0.8219286457205435, 0))) as fillet6_piece_1:
        with BuildLine():
            CenterArc((168.91 + FILLET6_R * 0.230868191133, FILLET6_R), FILLET6_R, 243.999999999, 26.000000001)
            Line((168.91 - FILLET6_R * 0.207502955669, FILLET6_R * 0.101205953707), (168.91, 0))
            Line((168.91, 0), (168.91 + FILLET6_R * 0.230868191133, 0))
        make_face()
    revolve(axis=Axis((0, 0, 10.795), (0, 0, -1)), revolution_arc=1.789016953, mode=Mode.SUBTRACT)
    with BuildSketch(Plane(origin=(0, 0, 10.795), x_dir=(-0.6020891736925713, -0.7984288490042157, 0), z_dir=(0.7984288490042157, -0.6020891736925713, 0))) as fillet6_piece_2:
        with BuildLine():
            CenterArc((168.91 + FILLET6_R * 0.230868191133, FILLET6_R), FILLET6_R, 243.999999999, 26.000000001)
            Line((168.91 - FILLET6_R * 0.207502955669, FILLET6_R * 0.101205953707), (168.91, 0))
            Line((168.91, 0), (168.91 + FILLET6_R * 0.230868191133, 0))
        make_face()
    revolve(axis=Axis((0, 0, 10.795), (0, 0, -1)), revolution_arc=3.739989845, mode=Mode.SUBTRACT)
    with BuildSketch(Plane(origin=(0, 0, 10.795), x_dir=(-0.6700488357917587, -0.7423170196446452, 0), z_dir=(0.7423170196446452, -0.6700488357917587, 0))) as fillet6_piece_3:
        with BuildLine():
            CenterArc((168.91 + FILLET6_R * 0.230868191133, FILLET6_R), FILLET6_R, 243.999999999, 26.000000001)
            Line((168.91 - FILLET6_R * 0.207502955669, FILLET6_R * 0.101205953707), (168.91, 0))
            Line((168.91, 0), (168.91 + FILLET6_R * 0.230868191133, 0))
        make_face()
    revolve(axis=Axis((0, 0, 10.795), (0, 0, -1)), revolution_arc=11.8963194, mode=Mode.SUBTRACT)


with BuildPart() as cut_extrude9_piece_2:
    # of the separate pieces the step leaves, piece 2, a body of its own (cut_extrude9_pieces)
    add(cut_extrude8_piece_1_1.part.solids().sort_by_distance((140.965544713, -73.008750871, 3.175))[0])

    # Sketch17 → Cut-Extrude10 (cut, through all)
    with BuildSketch(Plane.XY.offset(43.815)):
        with Locations((124.015012721, -121.332950523)):
            Circle(SKETCH17_R)
    extrude(amount=-CUT_EXTRUDE10_DEPTH, mode=Mode.SUBTRACT)


solid = cut_extrude9_piece_1.part
